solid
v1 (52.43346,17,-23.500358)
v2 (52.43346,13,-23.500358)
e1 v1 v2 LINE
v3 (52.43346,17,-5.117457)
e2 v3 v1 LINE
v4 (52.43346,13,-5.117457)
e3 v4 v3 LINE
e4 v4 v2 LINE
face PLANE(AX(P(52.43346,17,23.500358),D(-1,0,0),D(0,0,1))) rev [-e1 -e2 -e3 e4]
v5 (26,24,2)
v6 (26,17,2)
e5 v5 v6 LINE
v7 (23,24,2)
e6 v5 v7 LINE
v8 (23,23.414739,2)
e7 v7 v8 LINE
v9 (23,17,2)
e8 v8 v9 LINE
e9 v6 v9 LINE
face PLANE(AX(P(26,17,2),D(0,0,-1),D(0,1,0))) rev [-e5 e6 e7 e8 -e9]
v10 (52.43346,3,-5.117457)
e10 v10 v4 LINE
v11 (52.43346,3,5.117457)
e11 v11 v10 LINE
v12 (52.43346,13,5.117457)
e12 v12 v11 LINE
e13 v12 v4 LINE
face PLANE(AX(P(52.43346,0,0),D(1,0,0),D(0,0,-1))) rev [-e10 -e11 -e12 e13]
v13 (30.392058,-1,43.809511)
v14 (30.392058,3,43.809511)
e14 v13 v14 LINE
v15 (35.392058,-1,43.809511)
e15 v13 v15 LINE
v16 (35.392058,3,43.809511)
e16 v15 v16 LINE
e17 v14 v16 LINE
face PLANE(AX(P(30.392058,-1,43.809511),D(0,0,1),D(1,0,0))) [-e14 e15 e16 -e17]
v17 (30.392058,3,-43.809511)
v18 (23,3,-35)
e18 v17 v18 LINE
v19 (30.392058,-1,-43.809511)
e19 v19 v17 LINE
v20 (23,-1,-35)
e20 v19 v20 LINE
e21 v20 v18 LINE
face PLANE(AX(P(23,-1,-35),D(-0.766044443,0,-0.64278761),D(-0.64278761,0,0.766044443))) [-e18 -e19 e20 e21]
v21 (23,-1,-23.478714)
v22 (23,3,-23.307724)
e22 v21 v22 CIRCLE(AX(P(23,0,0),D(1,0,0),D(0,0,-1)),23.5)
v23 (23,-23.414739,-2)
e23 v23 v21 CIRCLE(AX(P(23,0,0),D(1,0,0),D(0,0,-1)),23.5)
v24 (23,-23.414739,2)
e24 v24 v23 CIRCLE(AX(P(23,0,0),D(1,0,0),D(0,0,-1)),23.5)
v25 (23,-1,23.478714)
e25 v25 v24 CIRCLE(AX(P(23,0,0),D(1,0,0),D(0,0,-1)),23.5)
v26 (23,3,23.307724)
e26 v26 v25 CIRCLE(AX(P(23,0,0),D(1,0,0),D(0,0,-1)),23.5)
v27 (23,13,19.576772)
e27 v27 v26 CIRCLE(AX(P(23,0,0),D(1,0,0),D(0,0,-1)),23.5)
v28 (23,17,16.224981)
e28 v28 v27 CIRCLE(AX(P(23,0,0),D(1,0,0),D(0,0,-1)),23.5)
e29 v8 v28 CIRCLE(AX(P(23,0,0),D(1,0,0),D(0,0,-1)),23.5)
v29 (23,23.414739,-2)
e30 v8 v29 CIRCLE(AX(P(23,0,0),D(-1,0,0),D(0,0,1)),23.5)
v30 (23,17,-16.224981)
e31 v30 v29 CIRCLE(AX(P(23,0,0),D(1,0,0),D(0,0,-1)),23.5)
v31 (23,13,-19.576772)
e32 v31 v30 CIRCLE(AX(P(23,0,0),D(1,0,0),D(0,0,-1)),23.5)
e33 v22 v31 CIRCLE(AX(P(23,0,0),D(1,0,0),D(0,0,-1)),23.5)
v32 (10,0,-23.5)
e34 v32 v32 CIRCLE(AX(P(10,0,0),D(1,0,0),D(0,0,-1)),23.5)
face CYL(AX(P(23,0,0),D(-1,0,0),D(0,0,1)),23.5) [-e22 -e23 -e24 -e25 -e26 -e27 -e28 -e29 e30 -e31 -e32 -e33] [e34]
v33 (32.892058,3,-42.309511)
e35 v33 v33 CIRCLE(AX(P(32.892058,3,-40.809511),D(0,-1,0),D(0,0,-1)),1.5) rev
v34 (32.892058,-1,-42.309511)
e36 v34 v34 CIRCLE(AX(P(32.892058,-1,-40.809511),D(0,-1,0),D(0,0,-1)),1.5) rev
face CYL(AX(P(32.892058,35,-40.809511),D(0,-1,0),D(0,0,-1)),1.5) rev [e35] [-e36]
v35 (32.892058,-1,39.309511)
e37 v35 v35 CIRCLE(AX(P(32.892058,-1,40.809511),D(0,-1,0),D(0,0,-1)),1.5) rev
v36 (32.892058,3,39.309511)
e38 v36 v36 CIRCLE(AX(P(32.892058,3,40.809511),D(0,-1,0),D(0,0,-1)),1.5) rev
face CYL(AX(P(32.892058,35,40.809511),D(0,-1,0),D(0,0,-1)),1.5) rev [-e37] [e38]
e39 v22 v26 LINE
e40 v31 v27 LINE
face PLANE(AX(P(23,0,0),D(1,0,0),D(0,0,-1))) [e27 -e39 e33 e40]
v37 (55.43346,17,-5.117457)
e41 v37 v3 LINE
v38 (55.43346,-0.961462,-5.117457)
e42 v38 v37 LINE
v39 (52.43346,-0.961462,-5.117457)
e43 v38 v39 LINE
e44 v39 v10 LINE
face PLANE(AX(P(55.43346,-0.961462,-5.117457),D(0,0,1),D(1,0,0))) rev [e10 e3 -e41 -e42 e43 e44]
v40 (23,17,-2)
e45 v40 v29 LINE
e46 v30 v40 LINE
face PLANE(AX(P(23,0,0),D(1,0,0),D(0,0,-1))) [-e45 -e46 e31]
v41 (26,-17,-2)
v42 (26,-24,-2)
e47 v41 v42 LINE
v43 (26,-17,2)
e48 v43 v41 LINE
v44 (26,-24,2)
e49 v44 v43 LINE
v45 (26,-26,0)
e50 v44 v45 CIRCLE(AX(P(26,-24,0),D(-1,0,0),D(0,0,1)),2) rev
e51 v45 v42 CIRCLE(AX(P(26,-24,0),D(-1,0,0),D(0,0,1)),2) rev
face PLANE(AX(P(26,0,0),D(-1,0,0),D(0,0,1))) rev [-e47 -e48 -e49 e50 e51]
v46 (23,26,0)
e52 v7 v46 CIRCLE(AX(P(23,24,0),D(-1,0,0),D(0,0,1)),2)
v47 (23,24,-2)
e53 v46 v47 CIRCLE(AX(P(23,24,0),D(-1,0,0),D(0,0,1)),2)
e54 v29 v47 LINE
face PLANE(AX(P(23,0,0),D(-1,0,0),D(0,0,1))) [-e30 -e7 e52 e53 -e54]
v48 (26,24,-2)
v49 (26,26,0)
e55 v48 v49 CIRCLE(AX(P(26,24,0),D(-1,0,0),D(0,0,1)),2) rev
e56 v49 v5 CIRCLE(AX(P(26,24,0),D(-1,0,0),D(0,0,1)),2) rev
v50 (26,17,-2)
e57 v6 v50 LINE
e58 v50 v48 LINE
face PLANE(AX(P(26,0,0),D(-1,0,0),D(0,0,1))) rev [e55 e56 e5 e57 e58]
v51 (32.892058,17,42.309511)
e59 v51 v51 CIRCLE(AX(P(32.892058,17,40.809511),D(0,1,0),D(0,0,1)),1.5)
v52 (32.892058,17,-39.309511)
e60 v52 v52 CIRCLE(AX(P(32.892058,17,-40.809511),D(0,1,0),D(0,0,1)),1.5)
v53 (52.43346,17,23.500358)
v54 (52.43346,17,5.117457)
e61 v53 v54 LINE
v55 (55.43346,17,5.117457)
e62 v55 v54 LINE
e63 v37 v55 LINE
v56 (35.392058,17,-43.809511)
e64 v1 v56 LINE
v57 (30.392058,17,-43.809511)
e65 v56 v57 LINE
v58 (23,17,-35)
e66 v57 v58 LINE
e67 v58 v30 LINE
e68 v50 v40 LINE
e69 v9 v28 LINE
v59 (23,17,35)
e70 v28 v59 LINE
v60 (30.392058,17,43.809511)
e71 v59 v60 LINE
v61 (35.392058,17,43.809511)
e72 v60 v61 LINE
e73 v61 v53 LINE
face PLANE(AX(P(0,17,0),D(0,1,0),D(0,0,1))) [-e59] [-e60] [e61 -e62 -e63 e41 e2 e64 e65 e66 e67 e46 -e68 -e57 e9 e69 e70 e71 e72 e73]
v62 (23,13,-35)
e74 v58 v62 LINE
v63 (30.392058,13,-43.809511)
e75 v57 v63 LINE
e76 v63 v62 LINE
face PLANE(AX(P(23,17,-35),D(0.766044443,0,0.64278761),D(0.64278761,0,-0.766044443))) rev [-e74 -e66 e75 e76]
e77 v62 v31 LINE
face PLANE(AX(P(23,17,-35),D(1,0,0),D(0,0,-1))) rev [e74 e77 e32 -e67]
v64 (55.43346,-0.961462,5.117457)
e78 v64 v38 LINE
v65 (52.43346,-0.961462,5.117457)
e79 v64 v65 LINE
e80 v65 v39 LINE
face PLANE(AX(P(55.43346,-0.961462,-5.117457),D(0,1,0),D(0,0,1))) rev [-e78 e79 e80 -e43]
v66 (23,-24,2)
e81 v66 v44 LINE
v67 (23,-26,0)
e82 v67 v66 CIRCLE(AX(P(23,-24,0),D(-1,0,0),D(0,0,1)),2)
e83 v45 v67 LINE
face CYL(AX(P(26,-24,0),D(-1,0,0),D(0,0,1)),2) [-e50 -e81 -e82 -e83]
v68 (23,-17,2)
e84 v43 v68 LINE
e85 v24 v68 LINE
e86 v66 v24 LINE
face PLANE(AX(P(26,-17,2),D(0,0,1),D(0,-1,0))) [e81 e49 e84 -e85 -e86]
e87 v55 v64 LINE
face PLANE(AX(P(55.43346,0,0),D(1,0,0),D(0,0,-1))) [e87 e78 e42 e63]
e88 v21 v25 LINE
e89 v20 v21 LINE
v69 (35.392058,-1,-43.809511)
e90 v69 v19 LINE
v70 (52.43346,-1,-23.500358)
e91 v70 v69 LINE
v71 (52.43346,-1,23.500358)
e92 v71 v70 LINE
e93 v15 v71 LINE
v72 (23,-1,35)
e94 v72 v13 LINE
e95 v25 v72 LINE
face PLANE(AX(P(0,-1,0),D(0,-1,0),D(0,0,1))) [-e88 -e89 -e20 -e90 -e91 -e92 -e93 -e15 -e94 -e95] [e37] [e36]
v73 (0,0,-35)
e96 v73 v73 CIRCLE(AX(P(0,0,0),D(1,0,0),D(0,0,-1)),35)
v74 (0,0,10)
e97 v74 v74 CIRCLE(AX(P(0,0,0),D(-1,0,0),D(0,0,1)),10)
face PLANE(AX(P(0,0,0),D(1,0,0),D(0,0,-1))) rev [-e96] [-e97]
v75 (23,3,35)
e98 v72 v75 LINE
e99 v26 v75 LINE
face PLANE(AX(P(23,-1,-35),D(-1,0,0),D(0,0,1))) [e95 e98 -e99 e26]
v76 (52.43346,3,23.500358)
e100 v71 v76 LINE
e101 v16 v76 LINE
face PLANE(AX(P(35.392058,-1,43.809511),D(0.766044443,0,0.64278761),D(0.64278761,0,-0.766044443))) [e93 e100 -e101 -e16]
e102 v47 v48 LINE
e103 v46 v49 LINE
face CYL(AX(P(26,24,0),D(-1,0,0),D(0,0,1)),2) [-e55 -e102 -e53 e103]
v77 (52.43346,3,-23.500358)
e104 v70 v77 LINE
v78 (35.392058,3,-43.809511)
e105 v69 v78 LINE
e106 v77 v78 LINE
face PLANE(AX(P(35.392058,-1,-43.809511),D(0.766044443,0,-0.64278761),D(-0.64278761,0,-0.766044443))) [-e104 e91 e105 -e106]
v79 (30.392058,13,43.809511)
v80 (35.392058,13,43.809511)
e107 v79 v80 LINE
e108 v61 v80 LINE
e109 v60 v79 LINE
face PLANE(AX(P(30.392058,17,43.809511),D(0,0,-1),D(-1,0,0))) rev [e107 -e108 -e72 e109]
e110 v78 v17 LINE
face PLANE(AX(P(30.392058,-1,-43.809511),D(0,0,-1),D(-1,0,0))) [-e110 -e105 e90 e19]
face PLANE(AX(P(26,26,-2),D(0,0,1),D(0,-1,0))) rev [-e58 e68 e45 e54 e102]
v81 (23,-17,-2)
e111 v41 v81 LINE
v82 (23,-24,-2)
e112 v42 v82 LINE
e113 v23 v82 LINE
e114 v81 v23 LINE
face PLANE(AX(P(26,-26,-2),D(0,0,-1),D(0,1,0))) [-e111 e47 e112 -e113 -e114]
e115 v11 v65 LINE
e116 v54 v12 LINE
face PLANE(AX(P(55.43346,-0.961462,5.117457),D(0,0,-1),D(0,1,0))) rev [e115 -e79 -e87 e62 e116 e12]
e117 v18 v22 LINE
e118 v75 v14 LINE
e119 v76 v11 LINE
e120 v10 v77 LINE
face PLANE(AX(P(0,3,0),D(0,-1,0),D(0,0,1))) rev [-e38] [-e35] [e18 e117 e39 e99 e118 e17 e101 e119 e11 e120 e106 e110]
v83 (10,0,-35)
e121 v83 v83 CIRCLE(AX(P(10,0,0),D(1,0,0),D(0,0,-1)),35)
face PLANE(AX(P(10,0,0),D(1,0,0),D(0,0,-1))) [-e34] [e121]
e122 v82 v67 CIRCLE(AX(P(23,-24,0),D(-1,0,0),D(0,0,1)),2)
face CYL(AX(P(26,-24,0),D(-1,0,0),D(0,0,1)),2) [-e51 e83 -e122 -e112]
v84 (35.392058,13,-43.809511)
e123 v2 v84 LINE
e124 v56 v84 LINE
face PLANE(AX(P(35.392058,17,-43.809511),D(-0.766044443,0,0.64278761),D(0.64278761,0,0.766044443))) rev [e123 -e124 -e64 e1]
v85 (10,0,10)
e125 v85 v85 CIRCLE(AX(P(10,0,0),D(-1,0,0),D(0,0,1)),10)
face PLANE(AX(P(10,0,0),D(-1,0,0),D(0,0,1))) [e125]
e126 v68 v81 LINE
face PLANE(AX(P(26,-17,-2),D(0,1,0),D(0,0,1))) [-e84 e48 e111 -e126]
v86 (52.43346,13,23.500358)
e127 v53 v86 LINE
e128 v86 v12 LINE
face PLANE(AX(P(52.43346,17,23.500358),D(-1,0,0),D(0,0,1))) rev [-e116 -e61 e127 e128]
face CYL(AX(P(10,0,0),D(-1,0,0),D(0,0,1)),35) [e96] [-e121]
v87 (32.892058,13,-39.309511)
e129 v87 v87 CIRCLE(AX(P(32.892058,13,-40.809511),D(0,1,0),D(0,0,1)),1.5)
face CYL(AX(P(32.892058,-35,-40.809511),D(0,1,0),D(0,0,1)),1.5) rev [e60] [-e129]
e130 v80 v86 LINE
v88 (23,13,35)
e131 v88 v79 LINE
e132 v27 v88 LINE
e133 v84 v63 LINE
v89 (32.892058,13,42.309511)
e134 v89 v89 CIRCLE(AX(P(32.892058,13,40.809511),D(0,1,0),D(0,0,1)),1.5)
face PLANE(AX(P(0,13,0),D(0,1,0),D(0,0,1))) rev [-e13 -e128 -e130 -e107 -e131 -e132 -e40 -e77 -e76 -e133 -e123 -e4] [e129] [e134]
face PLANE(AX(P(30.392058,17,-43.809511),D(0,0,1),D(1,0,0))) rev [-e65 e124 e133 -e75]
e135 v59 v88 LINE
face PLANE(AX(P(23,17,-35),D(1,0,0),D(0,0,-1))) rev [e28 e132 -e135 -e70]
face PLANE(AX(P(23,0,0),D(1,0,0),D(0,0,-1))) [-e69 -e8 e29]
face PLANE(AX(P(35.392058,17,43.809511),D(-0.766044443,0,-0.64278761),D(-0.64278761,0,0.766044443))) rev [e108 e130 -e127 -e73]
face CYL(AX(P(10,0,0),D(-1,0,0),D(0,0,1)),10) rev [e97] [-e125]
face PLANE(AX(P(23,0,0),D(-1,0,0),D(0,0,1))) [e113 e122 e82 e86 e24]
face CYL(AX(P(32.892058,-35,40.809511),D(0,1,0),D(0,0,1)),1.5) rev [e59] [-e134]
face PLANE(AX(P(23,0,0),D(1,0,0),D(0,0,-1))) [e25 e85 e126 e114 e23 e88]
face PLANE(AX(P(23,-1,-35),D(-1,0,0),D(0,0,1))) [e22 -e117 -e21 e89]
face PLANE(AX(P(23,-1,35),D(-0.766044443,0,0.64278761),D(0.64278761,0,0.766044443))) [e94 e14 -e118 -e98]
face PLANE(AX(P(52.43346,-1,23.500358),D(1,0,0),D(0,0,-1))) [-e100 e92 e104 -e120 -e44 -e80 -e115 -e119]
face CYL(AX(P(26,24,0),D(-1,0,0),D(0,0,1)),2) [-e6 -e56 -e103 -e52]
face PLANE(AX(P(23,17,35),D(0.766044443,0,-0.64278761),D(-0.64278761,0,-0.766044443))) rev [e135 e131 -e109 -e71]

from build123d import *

# Parameters (mm, degrees)
SKETCH1_R            = 35
BOSS_EXTRUDE1_DEPTH  = 10
SKETCH2_R            = 23.5
BOSS_EXTRUDE2_DEPTH  = 13
BOSS_EXTRUDE4_DEPTH  = 4
SKETCH5_R            = 1.5
CUT_EXTRUDE1_DEPTH   = 86.86350209
SKETCH6_W            = 4
SKETCH6_H            = 9
BOSS_EXTRUDE5_DEPTH  = 3
FILLET1_R            = 2
FILLET1_OF_MIRROR2_R = 2
SKETCH8_R            = 10
CUT_EXTRUDE2_DEPTH   = 10
SKETCH11_W           = 10.23491337
SKETCH11_H           = 17.961461559
BOSS_EXTRUDE6_DEPTH  = 3


with BuildPart() as part:
    # Sketch1 → Boss-Extrude1 (new body)
    with BuildSketch(Plane(origin=(0, 0, 0), x_dir=(0, 0, -1), z_dir=(1, 0, 0))):
        Circle(SKETCH1_R)
    extrude(amount=BOSS_EXTRUDE1_DEPTH)

    # Sketch2 → Boss-Extrude2 (add)
    with BuildSketch(Plane(origin=(10, 0, 0), x_dir=(0, 0, -1), z_dir=(1, 0, 0))):
        with Locations(Location((0, 0, 0), (0, 0, 180))):
            Circle(SKETCH2_R)
    extrude(amount=BOSS_EXTRUDE2_DEPTH)

    # Sketch3 → Boss-Extrude4 (add)
    with BuildSketch(Plane(origin=(0, 13, 0), x_dir=(1, 0, 0), z_dir=(0, 1, 0))):
        Polygon((23, 35), (23, -35), (30.392057511, -43.809511096), (35.392057511, -43.809511096), (52.43346001, -23.500358445), (52.43346001, 23.500358445), (35.392057511, 43.809511096), (30.392057511, 43.809511096), align=None)
    boss_extrude4 = extrude(amount=BOSS_EXTRUDE4_DEPTH)

    # Sketch5 → Cut-Extrude1 (cut, symmetric)
    with BuildSketch(Plane(origin=(0, 17, 0), x_dir=(1, 0, 0), z_dir=(0, 1, 0))):
        with Locations(Location((32.892057511, -40.809511096, 0), (0, 0, 270))):
            Circle(SKETCH5_R)
        with Locations(Location((32.892057511, 40.809511096, 0), (0, 0, 270))):
            Circle(SKETCH5_R)
    cut_extrude1 = extrude(amount=CUT_EXTRUDE1_DEPTH, both=True, mode=Mode.SUBTRACT)

    # Sketch6 → Boss-Extrude5 (add)
    with BuildSketch(Plane(origin=(23, 0, 0), x_dir=(0, 0, -1), z_dir=(1, 0, 0))):
        with Locations((0, 21.5)):
            Rectangle(SKETCH6_W, SKETCH6_H)
    boss_extrude5 = extrude(amount=BOSS_EXTRUDE5_DEPTH)

    # Fillet1
    fillet1_edges = [part.edges().sort_by_distance(p)[0] for p in [
        (24.5, 26, -2),
        (24.5, 26, 2),
    ]]
    fillet(fillet1_edges, radius=FILLET1_R - 0.0001)  # a hair under: the kernel refuses the full size

    # Mirror2: Boss-Extrude5 across plane
    add(boss_extrude5.mirror(Plane.ZX))

    # Fillet1 of Mirror2
    fillet1_of_mirror2_edges = [part.edges().sort_by_distance(p)[0] for p in [
        (24.5, -26, -2),
        (24.5, -26, 2),
    ]]
    fillet(fillet1_of_mirror2_edges, radius=FILLET1_OF_MIRROR2_R - 0.0001)  # a hair under: the kernel refuses the full size

    # Sketch8 → Cut-Extrude2 (cut)
    with BuildSketch(Plane.ZY):
        Circle(SKETCH8_R)
    extrude(amount=-CUT_EXTRUDE2_DEPTH, mode=Mode.SUBTRACT)

    # Mirror3: Boss-Extrude4, Cut-Extrude1 across plane
    add(boss_extrude4.mirror(Plane(origin=(0, 8, 0), x_dir=(0, 0, 1), z_dir=(0, -1, 0))))
    add(cut_extrude1.mirror(Plane(origin=(0, 8, 0), x_dir=(0, 0, 1), z_dir=(0, -1, 0))), mode=Mode.SUBTRACT)

    # Sketch11 → Boss-Extrude6 (add)
    with BuildSketch(Plane(origin=(52.43346001, 0, 0), x_dir=(0, 0, -1), z_dir=(1, 0, 0))):
        with Locations((0, 8.019269221)):
            Rectangle(SKETCH11_W, SKETCH11_H)
    extrude(amount=BOSS_EXTRUDE6_DEPTH)


solid = part.part
